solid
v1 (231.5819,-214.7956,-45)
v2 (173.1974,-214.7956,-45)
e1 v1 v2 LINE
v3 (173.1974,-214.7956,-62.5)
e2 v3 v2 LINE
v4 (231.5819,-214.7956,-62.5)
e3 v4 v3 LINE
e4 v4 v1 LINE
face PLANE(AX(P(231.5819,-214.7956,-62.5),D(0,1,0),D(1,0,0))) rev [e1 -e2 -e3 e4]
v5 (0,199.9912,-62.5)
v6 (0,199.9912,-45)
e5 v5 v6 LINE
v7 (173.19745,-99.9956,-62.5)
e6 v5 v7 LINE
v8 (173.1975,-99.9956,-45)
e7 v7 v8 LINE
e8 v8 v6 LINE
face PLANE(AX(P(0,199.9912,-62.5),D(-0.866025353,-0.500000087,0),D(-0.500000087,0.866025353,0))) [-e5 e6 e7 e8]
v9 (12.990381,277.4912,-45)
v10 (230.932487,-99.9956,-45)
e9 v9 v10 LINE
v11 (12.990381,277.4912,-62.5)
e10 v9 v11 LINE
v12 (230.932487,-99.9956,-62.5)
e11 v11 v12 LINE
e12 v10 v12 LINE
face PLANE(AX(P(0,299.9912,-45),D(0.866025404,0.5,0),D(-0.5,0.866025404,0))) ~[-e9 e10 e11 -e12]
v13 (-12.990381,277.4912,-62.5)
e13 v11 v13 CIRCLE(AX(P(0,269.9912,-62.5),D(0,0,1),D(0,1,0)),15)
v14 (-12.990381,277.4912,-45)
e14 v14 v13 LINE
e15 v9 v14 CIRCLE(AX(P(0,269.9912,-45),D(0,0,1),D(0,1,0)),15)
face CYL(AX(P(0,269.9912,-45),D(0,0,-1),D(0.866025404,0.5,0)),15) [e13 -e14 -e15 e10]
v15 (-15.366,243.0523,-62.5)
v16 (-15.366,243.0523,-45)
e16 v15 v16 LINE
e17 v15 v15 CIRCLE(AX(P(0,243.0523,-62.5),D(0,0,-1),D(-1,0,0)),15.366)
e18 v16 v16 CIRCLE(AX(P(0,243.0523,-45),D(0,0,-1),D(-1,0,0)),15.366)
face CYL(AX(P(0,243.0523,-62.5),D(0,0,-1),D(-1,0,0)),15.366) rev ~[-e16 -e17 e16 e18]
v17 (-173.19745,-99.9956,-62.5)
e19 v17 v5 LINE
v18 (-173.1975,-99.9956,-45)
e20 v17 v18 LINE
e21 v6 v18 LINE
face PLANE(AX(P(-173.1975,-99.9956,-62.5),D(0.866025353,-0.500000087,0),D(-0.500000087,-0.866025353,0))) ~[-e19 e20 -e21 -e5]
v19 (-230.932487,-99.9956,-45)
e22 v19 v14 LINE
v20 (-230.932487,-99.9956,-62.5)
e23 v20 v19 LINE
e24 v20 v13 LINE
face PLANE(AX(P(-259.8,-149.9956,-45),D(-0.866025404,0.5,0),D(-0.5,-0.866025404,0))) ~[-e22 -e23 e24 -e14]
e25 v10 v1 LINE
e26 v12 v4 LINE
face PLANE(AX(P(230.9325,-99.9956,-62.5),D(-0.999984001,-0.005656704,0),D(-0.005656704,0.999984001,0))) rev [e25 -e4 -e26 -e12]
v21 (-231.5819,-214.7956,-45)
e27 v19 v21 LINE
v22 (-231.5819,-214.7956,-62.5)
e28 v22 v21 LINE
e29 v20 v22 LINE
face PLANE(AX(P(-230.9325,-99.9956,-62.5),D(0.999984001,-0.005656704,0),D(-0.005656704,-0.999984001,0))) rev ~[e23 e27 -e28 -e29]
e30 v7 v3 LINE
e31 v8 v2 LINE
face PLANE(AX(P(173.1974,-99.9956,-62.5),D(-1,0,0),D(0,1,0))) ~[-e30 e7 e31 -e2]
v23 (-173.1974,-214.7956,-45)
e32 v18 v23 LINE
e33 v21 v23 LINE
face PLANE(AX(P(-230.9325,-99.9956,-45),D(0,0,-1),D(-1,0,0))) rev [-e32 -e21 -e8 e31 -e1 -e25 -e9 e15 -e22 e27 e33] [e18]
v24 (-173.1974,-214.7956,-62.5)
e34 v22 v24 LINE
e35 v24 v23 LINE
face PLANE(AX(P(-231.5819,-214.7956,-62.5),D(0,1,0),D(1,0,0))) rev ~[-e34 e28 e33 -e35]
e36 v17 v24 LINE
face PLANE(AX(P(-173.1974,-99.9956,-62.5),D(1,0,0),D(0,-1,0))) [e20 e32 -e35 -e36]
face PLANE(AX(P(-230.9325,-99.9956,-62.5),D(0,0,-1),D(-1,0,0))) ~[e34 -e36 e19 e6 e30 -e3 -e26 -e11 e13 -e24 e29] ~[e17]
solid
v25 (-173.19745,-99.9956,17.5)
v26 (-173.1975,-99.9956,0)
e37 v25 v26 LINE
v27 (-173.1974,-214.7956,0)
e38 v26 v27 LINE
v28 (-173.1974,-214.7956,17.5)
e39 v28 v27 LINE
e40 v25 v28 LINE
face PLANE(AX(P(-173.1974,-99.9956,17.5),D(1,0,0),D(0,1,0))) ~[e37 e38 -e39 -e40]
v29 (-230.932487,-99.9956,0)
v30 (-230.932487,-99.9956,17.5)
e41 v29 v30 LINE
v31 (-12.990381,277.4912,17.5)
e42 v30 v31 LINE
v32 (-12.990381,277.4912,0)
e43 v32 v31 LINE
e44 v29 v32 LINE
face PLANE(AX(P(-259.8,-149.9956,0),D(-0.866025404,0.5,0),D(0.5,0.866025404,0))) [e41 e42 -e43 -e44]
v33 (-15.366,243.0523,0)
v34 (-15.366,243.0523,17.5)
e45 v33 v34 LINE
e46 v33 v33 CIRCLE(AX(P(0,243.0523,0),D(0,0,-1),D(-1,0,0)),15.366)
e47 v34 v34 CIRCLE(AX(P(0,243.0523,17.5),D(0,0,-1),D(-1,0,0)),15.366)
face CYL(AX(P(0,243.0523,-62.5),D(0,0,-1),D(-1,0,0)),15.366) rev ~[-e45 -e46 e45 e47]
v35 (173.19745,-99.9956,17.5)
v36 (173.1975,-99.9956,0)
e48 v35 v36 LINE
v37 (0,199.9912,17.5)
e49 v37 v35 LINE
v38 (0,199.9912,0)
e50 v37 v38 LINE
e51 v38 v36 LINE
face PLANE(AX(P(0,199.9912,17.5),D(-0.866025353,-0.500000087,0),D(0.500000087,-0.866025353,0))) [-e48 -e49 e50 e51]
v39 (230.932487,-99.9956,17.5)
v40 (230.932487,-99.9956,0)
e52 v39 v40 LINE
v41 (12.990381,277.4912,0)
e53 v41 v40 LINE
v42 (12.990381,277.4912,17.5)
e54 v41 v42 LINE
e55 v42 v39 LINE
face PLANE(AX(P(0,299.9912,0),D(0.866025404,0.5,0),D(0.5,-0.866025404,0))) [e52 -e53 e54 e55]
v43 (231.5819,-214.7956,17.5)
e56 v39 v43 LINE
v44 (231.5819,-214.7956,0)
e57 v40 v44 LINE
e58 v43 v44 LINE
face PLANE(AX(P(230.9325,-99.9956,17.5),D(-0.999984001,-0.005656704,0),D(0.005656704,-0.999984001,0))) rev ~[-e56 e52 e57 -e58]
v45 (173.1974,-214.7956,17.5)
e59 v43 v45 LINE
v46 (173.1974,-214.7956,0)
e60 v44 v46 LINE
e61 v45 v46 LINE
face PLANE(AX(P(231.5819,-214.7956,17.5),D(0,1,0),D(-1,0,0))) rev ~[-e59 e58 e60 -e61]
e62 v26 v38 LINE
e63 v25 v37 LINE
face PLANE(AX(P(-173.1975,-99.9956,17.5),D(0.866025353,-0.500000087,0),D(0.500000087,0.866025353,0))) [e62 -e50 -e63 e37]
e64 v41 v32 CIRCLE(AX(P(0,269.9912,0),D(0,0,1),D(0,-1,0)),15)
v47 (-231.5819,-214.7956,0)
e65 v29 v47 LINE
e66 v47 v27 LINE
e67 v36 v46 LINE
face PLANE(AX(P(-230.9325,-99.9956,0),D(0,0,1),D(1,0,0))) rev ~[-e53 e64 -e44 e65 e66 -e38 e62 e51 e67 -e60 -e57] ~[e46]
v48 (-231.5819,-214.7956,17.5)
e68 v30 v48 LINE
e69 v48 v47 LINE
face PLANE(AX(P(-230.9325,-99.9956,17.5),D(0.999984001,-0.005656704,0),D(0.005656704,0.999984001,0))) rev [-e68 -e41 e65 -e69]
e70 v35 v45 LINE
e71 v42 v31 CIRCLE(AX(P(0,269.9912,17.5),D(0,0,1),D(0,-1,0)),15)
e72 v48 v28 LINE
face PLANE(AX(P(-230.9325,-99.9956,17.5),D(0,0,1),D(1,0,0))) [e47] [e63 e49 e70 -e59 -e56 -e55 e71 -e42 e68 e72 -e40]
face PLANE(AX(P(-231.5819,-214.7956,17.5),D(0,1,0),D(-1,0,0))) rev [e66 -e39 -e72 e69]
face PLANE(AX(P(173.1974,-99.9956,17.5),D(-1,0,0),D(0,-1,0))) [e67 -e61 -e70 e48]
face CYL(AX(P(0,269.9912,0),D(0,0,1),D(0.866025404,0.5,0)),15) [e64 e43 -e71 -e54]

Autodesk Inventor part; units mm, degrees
ref_plane "XZ Plane" through (0, 0, 0) normal (0, 1, 0) x (-1, 0, 0)
sketch "Sketch5" plane through (0, 0, 0) normal (0, 0, 1) x (1, 0, 0)
  line L0 (0, 299.9912) -> (259.8, -149.9956)
  line L1 (259.8, -149.9956) -> (-259.8, -149.9956)
  line L2 (-259.8, -149.9956) -> (0, 299.9912)
  point P0 (0, 0)
  point P1 (0, 0)
  dimension "d12" = 519.6
extrude "Extrusion5" add sketch "Sketch5" along normal blind 17.5
sketch "Sketch6" plane through (0, 0, 17.5) normal (0, 0, 1) x (1, 0, 0)
  point P0 (0, 0)
sketch "Sketch7" plane through (0, 0, 17.5) normal (0, 0, 1) x (1, 0, 0)
  point P0 (0, 0)
sketch "Sketch8" plane through (0, 0, 17.5) normal (0, 0, 1) x (1, 0, 0)
  line L0 (0, 199.9912) -> (173.1975, -99.9956)
  line L1 (173.1975, -99.9956) -> (-173.1975, -99.9956)
  line L2 (-173.1975, -99.9956) -> (0, 199.9912)
  line L3 (259.8, -149.9956) -> (0, 299.9912) projected
  point P0 (0, 0)
  point P1 (0, 0)
  dimension "d15" = 50
extrude "Extrusion6" cut sketch "Sketch8" against normal blind 323.25
sketch "Sketch9" plane through (0, 0, 17.5) normal (0, 0, 1) x (1, 0, 0)
  line L0 (-297.8185, -99.9956) -> (278.7912, -99.9956)
  line L1 (278.7912, -99.9956) -> (278.7912, -149.9956)
  line L2 (278.7912, -149.9956) -> (-297.8185, -149.9956)
  line L3 (-297.8185, -149.9956) -> (-297.8185, -99.9956)
  point P0 (0, 0)
extrude "Extrusion7" cut sketch "Sketch9" against normal blind 130.25
ref_plane "Work Plane2" through (0, 0, -22.5) normal (0, 0, -1) x (-1, 0, 0)
sketch "Sketch10" plane through (0, 0, -22.5) normal (0, 0, -1) x (-1, 0, 0)
  point P0 (0, 0)
mirror "Mirror3" about plane through (0, 0, -22.5) normal (0, 0, -1) of "Extrusion5", "Extrusion6", "Extrusion7"
fillet "Fillet3" radius 15 2 edges at (0, 299.9912, -53.75) (0, 299.9912, 8.75)
sketch "Sketch11" plane through (230.9325, -99.9956, -62.5) normal (0, 0, -1) x (-1, 0, 0)
  circle A0 centre (230.9325, 343.0479) radius 15.366
  point P0 (230.9325, 99.9956)
extrude "Extrusion8" cut sketch "Sketch11" against normal blind 474.75
sketch "Sketch12" plane through (230.9325, -99.9956, -62.5) normal (0, 0, -1) x (-1, 0, 0)
  line L0 (461.865, 0) -> (243.9229, 377.4868) projected
  line L1 (461.865, 0) -> (462.5144, -114.8)
  line L2 (404.1299, 0) -> (230.9325, 299.9868) projected
  line L3 (404.1299, 0) -> (404.1299, -114.8)
  line L4 (57.735, 0) -> (57.735, -112.3529)
  line L5 (57.735, 0) -> (0, 0) projected
  line L6 (0, 0) -> (0, -112.3529)
  line L7 (0, -112.3529) -> (57.735, -112.3529)
  line L8 (462.5144, -114.8) -> (404.1299, -114.8)
  line L9 (461.865, 0) -> (404.1299, 0)
  line L10 (0, 0) -> (57.735, 0) projected
  line L11 (57.735, 0) -> (0, 0)
  point P0 (230.9325, 99.9956)
  dimension "d24" = 114.8
extrude "Extrusion9" add sketch "Sketch12" against normal blind 17.5 contours L1 L8 L3 L9
sketch "Sketch13" plane through (230.9325, -99.9956, -62.5) normal (0, 0, -1) x (-1, 0, 0)
  point P0 (230.9325, 99.9956)
ref_plane "Work Plane3" through (0, 0, -22.5) normal (1, 0, 0) x (0, 1, 0)
mirror "Mirror4" about plane through (0, 0, -22.5) normal (1, 0, 0) of "Extrusion9"
mirror "Mirror5" about plane through (0, 0, -22.5) normal (0, 0, -1) of "Extrusion9", "Mirror4"
ref_plane "Work Plane4" through (0, 0, -22.5) normal (0, 0, -1) x (-1, 0, 0)
properties part number "tri"
